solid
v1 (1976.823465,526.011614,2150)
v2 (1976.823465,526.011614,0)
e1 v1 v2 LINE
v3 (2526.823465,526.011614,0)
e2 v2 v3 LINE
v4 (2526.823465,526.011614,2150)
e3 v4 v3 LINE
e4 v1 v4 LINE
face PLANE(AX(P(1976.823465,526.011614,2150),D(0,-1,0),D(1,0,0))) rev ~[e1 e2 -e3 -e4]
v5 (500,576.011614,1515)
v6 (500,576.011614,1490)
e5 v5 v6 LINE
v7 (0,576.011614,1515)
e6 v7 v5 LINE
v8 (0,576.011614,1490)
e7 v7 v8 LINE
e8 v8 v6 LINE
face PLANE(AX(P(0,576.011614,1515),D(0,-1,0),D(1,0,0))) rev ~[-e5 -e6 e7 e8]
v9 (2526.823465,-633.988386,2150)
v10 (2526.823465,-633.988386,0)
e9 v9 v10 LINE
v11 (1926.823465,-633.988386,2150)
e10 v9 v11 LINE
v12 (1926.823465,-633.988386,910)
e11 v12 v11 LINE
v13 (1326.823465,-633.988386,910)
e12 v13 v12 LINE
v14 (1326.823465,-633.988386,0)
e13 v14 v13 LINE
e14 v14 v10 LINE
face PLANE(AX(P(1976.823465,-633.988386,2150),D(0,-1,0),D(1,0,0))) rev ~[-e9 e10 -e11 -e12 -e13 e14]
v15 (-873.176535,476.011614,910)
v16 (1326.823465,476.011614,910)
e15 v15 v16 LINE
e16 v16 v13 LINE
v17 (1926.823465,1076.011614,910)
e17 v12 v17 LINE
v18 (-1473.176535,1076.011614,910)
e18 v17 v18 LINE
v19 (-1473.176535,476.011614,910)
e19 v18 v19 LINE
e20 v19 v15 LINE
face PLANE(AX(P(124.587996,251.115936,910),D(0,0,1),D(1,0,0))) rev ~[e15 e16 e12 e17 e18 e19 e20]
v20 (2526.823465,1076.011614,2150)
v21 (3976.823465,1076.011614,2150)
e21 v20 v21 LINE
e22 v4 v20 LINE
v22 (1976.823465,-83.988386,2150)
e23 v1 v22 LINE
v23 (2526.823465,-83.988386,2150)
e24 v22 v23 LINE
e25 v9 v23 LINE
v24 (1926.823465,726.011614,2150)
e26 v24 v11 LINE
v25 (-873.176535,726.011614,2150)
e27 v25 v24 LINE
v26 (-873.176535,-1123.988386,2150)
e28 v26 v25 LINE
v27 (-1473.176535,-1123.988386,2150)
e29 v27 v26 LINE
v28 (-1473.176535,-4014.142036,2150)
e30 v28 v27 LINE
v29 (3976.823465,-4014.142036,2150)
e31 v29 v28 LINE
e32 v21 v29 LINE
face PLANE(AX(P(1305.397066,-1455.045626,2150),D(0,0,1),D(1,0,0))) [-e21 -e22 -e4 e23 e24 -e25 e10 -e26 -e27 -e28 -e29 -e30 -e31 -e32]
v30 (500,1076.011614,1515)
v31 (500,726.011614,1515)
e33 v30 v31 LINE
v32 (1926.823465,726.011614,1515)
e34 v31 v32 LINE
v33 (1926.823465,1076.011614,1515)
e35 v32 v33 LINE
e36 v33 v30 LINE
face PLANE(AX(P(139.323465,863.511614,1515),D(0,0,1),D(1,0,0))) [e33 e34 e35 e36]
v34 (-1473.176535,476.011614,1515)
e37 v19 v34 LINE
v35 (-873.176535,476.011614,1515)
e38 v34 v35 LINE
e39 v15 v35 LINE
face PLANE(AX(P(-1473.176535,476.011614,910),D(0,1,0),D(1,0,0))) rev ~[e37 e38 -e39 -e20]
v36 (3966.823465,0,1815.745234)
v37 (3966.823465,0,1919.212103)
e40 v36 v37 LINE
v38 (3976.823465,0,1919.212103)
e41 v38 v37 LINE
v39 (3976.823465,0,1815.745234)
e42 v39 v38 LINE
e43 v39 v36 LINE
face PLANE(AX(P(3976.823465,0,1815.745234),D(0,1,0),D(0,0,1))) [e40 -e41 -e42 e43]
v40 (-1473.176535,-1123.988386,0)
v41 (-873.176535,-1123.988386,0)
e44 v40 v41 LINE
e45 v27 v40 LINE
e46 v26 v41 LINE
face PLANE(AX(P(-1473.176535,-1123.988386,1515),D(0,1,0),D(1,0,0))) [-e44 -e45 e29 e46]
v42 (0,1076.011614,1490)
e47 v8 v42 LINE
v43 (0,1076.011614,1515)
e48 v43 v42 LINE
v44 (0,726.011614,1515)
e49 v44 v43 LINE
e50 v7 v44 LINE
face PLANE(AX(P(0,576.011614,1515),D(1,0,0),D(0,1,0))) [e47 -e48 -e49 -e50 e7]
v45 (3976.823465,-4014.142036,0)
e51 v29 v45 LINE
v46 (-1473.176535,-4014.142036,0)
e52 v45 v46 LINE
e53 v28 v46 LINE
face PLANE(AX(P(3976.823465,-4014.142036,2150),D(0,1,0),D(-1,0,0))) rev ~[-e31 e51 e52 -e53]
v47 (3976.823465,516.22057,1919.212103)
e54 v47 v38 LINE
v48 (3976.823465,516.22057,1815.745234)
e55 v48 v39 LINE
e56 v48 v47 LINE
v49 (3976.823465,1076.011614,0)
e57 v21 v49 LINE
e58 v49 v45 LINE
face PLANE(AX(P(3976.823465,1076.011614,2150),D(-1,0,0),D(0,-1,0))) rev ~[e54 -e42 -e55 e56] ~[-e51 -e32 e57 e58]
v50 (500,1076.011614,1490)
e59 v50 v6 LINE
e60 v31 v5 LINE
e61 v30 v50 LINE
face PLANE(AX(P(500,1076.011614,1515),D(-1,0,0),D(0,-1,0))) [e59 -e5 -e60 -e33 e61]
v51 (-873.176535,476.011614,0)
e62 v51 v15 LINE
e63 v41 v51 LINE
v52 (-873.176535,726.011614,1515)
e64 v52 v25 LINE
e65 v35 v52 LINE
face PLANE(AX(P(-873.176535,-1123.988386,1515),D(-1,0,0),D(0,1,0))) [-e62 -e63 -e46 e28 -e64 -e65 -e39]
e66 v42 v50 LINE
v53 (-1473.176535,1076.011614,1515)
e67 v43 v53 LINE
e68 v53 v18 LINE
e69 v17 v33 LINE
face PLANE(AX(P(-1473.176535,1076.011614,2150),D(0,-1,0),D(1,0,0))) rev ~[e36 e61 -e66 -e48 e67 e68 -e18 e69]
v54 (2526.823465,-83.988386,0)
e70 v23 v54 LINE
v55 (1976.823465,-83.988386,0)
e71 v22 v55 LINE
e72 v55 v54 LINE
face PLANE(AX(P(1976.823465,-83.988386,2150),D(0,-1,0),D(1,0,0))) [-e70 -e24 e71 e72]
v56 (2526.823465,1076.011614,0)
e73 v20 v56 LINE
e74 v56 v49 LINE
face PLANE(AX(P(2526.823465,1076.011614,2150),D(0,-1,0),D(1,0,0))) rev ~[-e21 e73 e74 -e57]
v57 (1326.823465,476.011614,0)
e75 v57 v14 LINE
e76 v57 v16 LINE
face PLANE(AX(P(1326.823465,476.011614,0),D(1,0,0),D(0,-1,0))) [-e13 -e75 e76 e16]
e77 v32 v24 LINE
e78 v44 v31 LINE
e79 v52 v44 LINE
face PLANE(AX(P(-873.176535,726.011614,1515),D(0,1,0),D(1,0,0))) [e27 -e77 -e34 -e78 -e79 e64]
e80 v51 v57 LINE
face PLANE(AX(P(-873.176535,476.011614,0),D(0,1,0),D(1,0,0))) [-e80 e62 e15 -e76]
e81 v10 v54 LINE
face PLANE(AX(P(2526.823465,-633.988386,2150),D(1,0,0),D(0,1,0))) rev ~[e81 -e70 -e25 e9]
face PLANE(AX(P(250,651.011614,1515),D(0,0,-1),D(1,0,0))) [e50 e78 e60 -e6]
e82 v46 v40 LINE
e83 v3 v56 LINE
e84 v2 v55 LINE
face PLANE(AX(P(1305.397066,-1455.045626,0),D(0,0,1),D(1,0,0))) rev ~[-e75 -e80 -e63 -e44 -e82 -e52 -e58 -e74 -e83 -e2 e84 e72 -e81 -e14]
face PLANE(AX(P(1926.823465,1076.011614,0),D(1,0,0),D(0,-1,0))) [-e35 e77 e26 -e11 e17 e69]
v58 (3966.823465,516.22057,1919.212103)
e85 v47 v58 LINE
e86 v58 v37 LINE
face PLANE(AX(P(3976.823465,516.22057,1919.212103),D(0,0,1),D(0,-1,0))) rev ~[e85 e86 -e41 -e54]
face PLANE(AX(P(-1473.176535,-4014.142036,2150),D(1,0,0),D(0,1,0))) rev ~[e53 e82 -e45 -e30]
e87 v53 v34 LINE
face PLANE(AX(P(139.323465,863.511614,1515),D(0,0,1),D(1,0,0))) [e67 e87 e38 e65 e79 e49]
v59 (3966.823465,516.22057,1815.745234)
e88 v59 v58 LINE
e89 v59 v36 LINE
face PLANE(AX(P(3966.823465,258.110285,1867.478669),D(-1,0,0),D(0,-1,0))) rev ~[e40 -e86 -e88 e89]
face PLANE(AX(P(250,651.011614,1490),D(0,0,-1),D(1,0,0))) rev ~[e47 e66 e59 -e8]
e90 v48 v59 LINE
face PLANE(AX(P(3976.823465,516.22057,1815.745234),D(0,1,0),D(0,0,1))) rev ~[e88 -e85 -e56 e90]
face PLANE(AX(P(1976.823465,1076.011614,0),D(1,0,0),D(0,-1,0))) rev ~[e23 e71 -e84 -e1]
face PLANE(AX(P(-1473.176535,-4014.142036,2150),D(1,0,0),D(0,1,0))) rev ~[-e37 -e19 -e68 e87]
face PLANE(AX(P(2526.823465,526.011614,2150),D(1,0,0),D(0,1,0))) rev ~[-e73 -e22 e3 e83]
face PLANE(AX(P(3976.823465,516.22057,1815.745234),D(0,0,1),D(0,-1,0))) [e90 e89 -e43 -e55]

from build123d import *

# Parameters (mm, degrees)
F1_DEPTH  = 910
F2_W      = 600
F2_H      = 1600
F3_DEPTH  = 605
F4_W      = 600
F4_H      = 1600
F5_DEPTH  = 635
F6_W      = 500
F6_H      = 150
F6_H_2    = 350
F7_DEPTH  = 25
F8_W      = 50
F8_H      = 1710
F9_DEPTH  = 2150
F10_W     = 550
F10_H     = 550
F11_DEPTH = 2150
F12_W     = 516.2205696106
F12_H     = 103.4668684006
F13_DEPTH = 10
F14_W     = 5881.225649956
F14_H     = 5462.1144815301
F15_DEPTH = 2150


with BuildPart() as f1:
    # F0 (on Top) → F1 (new body)
    with BuildSketch(Plane.XY):
        Polygon((-1473.1765345304, 1076.0116144037), (-1473.1765345304, -1123.9883855963), (-873.1765345304, -1123.9883855963), (-873.1765345304, 476.0116144037), (1326.8234654696, 476.0116144037), (1326.8234654696, -633.9883855963), (1926.8234654696, -633.9883855963), (1926.8234654696, 1076.0116144037), align=None)
    extrude(amount=F1_DEPTH)

    # F2 (on face) → F3 (join)
    with BuildSketch(Plane.XY.offset(910)):
        with Locations((-1173.1765345304, -323.9883855963)):
            Rectangle(F2_W, F2_H)
    extrude(amount=F3_DEPTH)

    # F4 (on face) → F5 (join)
    with BuildSketch(Plane.XY.offset(1515)):
        Polygon((-1473.1765345304, 476.0116144037), (-873.1765345304, 476.0116144037), (-873.1765345304, 726.0116144037), (1926.8234654696, 726.0116144037), (1926.8234654696, 1076.0116144037), (-1473.1765345304, 1076.0116144037), align=None)
        with Locations((-1173.1765345304, -323.9883855963)):
            Rectangle(F4_W, F4_H)
    extrude(amount=F5_DEPTH)

    # F6 (on face) → F7 (join)
    with BuildSketch(Plane(origin=(0, 0, 1515), x_dir=(1, 0, 0), z_dir=(0, 0, -1))):
        with Locations((250, -651.0116144037)):
            Rectangle(F6_W, F6_H)
        with Locations((250, -901.0116144037)):
            Rectangle(F6_W, F6_H_2)
    extrude(amount=F7_DEPTH)

    # F8 (on face) → F9 (join, through all)
    with BuildSketch(Plane(origin=(0, 0, 0), x_dir=(1, 0, 0), z_dir=(0, 0, -1))):
        with Locations((1951.8234654696, -221.0116144037)):
            Rectangle(F8_W, F8_H)
    extrude(amount=-F9_DEPTH)

    # F10 (on face) → F11 (join, through all)
    with BuildSketch(Plane.XY.offset(2150)):
        with Locations((2251.8234654696, -358.9883855963)):
            Rectangle(F10_W, F10_H)
        with Locations((2251.8234654696, 801.0116144037)):
            Rectangle(F10_W, F10_H)
        Polygon((-1473.1765345304, 1276.0116144037), (-1473.1765345304, 1076.0116144037), (1976.8234654696, 1076.0116144037), (2526.8234654696, 1076.0116144037), (3976.8234654696, 1076.0116144037), (3976.8234654696, 1276.0116144037), align=None)
        Polygon((4246.0098906786, 1276.0116144037), (3976.8234654696, 1276.0116144037), (3976.8234654696, 1076.0116144037), (3976.8234654696, -4014.142036438), (4246.0098906786, -4014.142036438), align=None)
        Polygon((3976.8234654696, -4014.142036438), (-1473.1765345304, -4014.142036438), (-1473.1765345304, -4186.1028671265), (4246.0098906786, -4186.1028671265), (4246.0098906786, -4014.142036438), align=None)
        Polygon((-1473.1765345304, -1123.9883855963), (-1473.1765345304, 1076.0116144037), (-1473.1765345304, 1276.0116144037), (-1635.2157592773, 1276.0116144037), (-1635.2157592773, -4186.1028671265), (-1473.1765345304, -4186.1028671265), (-1473.1765345304, -4014.142036438), align=None)
    extrude(amount=-F11_DEPTH)

    # F12 (on face) → F13 (join)
    with BuildSketch(Plane(origin=(3976.8234654696, 0, 0), x_dir=(0, -1, 0), z_dir=(-1, 0, 0))):
        with Locations((-258.1102848053, 1867.4786686897)):
            Rectangle(F12_W, F12_H)
    extrude(amount=F13_DEPTH)


with BuildPart() as f15:
    # F14 (on face) → F15 (new body, through all)
    with BuildSketch(Plane.XY.offset(2150)):
        with Locations((1305.3970657006, -1455.0456263614)):
            Rectangle(F14_W, F14_H)
    extrude(amount=-F15_DEPTH)

    # F16: cut F1
    add(f1.part, mode=Mode.SUBTRACT)


solid = f15.part
